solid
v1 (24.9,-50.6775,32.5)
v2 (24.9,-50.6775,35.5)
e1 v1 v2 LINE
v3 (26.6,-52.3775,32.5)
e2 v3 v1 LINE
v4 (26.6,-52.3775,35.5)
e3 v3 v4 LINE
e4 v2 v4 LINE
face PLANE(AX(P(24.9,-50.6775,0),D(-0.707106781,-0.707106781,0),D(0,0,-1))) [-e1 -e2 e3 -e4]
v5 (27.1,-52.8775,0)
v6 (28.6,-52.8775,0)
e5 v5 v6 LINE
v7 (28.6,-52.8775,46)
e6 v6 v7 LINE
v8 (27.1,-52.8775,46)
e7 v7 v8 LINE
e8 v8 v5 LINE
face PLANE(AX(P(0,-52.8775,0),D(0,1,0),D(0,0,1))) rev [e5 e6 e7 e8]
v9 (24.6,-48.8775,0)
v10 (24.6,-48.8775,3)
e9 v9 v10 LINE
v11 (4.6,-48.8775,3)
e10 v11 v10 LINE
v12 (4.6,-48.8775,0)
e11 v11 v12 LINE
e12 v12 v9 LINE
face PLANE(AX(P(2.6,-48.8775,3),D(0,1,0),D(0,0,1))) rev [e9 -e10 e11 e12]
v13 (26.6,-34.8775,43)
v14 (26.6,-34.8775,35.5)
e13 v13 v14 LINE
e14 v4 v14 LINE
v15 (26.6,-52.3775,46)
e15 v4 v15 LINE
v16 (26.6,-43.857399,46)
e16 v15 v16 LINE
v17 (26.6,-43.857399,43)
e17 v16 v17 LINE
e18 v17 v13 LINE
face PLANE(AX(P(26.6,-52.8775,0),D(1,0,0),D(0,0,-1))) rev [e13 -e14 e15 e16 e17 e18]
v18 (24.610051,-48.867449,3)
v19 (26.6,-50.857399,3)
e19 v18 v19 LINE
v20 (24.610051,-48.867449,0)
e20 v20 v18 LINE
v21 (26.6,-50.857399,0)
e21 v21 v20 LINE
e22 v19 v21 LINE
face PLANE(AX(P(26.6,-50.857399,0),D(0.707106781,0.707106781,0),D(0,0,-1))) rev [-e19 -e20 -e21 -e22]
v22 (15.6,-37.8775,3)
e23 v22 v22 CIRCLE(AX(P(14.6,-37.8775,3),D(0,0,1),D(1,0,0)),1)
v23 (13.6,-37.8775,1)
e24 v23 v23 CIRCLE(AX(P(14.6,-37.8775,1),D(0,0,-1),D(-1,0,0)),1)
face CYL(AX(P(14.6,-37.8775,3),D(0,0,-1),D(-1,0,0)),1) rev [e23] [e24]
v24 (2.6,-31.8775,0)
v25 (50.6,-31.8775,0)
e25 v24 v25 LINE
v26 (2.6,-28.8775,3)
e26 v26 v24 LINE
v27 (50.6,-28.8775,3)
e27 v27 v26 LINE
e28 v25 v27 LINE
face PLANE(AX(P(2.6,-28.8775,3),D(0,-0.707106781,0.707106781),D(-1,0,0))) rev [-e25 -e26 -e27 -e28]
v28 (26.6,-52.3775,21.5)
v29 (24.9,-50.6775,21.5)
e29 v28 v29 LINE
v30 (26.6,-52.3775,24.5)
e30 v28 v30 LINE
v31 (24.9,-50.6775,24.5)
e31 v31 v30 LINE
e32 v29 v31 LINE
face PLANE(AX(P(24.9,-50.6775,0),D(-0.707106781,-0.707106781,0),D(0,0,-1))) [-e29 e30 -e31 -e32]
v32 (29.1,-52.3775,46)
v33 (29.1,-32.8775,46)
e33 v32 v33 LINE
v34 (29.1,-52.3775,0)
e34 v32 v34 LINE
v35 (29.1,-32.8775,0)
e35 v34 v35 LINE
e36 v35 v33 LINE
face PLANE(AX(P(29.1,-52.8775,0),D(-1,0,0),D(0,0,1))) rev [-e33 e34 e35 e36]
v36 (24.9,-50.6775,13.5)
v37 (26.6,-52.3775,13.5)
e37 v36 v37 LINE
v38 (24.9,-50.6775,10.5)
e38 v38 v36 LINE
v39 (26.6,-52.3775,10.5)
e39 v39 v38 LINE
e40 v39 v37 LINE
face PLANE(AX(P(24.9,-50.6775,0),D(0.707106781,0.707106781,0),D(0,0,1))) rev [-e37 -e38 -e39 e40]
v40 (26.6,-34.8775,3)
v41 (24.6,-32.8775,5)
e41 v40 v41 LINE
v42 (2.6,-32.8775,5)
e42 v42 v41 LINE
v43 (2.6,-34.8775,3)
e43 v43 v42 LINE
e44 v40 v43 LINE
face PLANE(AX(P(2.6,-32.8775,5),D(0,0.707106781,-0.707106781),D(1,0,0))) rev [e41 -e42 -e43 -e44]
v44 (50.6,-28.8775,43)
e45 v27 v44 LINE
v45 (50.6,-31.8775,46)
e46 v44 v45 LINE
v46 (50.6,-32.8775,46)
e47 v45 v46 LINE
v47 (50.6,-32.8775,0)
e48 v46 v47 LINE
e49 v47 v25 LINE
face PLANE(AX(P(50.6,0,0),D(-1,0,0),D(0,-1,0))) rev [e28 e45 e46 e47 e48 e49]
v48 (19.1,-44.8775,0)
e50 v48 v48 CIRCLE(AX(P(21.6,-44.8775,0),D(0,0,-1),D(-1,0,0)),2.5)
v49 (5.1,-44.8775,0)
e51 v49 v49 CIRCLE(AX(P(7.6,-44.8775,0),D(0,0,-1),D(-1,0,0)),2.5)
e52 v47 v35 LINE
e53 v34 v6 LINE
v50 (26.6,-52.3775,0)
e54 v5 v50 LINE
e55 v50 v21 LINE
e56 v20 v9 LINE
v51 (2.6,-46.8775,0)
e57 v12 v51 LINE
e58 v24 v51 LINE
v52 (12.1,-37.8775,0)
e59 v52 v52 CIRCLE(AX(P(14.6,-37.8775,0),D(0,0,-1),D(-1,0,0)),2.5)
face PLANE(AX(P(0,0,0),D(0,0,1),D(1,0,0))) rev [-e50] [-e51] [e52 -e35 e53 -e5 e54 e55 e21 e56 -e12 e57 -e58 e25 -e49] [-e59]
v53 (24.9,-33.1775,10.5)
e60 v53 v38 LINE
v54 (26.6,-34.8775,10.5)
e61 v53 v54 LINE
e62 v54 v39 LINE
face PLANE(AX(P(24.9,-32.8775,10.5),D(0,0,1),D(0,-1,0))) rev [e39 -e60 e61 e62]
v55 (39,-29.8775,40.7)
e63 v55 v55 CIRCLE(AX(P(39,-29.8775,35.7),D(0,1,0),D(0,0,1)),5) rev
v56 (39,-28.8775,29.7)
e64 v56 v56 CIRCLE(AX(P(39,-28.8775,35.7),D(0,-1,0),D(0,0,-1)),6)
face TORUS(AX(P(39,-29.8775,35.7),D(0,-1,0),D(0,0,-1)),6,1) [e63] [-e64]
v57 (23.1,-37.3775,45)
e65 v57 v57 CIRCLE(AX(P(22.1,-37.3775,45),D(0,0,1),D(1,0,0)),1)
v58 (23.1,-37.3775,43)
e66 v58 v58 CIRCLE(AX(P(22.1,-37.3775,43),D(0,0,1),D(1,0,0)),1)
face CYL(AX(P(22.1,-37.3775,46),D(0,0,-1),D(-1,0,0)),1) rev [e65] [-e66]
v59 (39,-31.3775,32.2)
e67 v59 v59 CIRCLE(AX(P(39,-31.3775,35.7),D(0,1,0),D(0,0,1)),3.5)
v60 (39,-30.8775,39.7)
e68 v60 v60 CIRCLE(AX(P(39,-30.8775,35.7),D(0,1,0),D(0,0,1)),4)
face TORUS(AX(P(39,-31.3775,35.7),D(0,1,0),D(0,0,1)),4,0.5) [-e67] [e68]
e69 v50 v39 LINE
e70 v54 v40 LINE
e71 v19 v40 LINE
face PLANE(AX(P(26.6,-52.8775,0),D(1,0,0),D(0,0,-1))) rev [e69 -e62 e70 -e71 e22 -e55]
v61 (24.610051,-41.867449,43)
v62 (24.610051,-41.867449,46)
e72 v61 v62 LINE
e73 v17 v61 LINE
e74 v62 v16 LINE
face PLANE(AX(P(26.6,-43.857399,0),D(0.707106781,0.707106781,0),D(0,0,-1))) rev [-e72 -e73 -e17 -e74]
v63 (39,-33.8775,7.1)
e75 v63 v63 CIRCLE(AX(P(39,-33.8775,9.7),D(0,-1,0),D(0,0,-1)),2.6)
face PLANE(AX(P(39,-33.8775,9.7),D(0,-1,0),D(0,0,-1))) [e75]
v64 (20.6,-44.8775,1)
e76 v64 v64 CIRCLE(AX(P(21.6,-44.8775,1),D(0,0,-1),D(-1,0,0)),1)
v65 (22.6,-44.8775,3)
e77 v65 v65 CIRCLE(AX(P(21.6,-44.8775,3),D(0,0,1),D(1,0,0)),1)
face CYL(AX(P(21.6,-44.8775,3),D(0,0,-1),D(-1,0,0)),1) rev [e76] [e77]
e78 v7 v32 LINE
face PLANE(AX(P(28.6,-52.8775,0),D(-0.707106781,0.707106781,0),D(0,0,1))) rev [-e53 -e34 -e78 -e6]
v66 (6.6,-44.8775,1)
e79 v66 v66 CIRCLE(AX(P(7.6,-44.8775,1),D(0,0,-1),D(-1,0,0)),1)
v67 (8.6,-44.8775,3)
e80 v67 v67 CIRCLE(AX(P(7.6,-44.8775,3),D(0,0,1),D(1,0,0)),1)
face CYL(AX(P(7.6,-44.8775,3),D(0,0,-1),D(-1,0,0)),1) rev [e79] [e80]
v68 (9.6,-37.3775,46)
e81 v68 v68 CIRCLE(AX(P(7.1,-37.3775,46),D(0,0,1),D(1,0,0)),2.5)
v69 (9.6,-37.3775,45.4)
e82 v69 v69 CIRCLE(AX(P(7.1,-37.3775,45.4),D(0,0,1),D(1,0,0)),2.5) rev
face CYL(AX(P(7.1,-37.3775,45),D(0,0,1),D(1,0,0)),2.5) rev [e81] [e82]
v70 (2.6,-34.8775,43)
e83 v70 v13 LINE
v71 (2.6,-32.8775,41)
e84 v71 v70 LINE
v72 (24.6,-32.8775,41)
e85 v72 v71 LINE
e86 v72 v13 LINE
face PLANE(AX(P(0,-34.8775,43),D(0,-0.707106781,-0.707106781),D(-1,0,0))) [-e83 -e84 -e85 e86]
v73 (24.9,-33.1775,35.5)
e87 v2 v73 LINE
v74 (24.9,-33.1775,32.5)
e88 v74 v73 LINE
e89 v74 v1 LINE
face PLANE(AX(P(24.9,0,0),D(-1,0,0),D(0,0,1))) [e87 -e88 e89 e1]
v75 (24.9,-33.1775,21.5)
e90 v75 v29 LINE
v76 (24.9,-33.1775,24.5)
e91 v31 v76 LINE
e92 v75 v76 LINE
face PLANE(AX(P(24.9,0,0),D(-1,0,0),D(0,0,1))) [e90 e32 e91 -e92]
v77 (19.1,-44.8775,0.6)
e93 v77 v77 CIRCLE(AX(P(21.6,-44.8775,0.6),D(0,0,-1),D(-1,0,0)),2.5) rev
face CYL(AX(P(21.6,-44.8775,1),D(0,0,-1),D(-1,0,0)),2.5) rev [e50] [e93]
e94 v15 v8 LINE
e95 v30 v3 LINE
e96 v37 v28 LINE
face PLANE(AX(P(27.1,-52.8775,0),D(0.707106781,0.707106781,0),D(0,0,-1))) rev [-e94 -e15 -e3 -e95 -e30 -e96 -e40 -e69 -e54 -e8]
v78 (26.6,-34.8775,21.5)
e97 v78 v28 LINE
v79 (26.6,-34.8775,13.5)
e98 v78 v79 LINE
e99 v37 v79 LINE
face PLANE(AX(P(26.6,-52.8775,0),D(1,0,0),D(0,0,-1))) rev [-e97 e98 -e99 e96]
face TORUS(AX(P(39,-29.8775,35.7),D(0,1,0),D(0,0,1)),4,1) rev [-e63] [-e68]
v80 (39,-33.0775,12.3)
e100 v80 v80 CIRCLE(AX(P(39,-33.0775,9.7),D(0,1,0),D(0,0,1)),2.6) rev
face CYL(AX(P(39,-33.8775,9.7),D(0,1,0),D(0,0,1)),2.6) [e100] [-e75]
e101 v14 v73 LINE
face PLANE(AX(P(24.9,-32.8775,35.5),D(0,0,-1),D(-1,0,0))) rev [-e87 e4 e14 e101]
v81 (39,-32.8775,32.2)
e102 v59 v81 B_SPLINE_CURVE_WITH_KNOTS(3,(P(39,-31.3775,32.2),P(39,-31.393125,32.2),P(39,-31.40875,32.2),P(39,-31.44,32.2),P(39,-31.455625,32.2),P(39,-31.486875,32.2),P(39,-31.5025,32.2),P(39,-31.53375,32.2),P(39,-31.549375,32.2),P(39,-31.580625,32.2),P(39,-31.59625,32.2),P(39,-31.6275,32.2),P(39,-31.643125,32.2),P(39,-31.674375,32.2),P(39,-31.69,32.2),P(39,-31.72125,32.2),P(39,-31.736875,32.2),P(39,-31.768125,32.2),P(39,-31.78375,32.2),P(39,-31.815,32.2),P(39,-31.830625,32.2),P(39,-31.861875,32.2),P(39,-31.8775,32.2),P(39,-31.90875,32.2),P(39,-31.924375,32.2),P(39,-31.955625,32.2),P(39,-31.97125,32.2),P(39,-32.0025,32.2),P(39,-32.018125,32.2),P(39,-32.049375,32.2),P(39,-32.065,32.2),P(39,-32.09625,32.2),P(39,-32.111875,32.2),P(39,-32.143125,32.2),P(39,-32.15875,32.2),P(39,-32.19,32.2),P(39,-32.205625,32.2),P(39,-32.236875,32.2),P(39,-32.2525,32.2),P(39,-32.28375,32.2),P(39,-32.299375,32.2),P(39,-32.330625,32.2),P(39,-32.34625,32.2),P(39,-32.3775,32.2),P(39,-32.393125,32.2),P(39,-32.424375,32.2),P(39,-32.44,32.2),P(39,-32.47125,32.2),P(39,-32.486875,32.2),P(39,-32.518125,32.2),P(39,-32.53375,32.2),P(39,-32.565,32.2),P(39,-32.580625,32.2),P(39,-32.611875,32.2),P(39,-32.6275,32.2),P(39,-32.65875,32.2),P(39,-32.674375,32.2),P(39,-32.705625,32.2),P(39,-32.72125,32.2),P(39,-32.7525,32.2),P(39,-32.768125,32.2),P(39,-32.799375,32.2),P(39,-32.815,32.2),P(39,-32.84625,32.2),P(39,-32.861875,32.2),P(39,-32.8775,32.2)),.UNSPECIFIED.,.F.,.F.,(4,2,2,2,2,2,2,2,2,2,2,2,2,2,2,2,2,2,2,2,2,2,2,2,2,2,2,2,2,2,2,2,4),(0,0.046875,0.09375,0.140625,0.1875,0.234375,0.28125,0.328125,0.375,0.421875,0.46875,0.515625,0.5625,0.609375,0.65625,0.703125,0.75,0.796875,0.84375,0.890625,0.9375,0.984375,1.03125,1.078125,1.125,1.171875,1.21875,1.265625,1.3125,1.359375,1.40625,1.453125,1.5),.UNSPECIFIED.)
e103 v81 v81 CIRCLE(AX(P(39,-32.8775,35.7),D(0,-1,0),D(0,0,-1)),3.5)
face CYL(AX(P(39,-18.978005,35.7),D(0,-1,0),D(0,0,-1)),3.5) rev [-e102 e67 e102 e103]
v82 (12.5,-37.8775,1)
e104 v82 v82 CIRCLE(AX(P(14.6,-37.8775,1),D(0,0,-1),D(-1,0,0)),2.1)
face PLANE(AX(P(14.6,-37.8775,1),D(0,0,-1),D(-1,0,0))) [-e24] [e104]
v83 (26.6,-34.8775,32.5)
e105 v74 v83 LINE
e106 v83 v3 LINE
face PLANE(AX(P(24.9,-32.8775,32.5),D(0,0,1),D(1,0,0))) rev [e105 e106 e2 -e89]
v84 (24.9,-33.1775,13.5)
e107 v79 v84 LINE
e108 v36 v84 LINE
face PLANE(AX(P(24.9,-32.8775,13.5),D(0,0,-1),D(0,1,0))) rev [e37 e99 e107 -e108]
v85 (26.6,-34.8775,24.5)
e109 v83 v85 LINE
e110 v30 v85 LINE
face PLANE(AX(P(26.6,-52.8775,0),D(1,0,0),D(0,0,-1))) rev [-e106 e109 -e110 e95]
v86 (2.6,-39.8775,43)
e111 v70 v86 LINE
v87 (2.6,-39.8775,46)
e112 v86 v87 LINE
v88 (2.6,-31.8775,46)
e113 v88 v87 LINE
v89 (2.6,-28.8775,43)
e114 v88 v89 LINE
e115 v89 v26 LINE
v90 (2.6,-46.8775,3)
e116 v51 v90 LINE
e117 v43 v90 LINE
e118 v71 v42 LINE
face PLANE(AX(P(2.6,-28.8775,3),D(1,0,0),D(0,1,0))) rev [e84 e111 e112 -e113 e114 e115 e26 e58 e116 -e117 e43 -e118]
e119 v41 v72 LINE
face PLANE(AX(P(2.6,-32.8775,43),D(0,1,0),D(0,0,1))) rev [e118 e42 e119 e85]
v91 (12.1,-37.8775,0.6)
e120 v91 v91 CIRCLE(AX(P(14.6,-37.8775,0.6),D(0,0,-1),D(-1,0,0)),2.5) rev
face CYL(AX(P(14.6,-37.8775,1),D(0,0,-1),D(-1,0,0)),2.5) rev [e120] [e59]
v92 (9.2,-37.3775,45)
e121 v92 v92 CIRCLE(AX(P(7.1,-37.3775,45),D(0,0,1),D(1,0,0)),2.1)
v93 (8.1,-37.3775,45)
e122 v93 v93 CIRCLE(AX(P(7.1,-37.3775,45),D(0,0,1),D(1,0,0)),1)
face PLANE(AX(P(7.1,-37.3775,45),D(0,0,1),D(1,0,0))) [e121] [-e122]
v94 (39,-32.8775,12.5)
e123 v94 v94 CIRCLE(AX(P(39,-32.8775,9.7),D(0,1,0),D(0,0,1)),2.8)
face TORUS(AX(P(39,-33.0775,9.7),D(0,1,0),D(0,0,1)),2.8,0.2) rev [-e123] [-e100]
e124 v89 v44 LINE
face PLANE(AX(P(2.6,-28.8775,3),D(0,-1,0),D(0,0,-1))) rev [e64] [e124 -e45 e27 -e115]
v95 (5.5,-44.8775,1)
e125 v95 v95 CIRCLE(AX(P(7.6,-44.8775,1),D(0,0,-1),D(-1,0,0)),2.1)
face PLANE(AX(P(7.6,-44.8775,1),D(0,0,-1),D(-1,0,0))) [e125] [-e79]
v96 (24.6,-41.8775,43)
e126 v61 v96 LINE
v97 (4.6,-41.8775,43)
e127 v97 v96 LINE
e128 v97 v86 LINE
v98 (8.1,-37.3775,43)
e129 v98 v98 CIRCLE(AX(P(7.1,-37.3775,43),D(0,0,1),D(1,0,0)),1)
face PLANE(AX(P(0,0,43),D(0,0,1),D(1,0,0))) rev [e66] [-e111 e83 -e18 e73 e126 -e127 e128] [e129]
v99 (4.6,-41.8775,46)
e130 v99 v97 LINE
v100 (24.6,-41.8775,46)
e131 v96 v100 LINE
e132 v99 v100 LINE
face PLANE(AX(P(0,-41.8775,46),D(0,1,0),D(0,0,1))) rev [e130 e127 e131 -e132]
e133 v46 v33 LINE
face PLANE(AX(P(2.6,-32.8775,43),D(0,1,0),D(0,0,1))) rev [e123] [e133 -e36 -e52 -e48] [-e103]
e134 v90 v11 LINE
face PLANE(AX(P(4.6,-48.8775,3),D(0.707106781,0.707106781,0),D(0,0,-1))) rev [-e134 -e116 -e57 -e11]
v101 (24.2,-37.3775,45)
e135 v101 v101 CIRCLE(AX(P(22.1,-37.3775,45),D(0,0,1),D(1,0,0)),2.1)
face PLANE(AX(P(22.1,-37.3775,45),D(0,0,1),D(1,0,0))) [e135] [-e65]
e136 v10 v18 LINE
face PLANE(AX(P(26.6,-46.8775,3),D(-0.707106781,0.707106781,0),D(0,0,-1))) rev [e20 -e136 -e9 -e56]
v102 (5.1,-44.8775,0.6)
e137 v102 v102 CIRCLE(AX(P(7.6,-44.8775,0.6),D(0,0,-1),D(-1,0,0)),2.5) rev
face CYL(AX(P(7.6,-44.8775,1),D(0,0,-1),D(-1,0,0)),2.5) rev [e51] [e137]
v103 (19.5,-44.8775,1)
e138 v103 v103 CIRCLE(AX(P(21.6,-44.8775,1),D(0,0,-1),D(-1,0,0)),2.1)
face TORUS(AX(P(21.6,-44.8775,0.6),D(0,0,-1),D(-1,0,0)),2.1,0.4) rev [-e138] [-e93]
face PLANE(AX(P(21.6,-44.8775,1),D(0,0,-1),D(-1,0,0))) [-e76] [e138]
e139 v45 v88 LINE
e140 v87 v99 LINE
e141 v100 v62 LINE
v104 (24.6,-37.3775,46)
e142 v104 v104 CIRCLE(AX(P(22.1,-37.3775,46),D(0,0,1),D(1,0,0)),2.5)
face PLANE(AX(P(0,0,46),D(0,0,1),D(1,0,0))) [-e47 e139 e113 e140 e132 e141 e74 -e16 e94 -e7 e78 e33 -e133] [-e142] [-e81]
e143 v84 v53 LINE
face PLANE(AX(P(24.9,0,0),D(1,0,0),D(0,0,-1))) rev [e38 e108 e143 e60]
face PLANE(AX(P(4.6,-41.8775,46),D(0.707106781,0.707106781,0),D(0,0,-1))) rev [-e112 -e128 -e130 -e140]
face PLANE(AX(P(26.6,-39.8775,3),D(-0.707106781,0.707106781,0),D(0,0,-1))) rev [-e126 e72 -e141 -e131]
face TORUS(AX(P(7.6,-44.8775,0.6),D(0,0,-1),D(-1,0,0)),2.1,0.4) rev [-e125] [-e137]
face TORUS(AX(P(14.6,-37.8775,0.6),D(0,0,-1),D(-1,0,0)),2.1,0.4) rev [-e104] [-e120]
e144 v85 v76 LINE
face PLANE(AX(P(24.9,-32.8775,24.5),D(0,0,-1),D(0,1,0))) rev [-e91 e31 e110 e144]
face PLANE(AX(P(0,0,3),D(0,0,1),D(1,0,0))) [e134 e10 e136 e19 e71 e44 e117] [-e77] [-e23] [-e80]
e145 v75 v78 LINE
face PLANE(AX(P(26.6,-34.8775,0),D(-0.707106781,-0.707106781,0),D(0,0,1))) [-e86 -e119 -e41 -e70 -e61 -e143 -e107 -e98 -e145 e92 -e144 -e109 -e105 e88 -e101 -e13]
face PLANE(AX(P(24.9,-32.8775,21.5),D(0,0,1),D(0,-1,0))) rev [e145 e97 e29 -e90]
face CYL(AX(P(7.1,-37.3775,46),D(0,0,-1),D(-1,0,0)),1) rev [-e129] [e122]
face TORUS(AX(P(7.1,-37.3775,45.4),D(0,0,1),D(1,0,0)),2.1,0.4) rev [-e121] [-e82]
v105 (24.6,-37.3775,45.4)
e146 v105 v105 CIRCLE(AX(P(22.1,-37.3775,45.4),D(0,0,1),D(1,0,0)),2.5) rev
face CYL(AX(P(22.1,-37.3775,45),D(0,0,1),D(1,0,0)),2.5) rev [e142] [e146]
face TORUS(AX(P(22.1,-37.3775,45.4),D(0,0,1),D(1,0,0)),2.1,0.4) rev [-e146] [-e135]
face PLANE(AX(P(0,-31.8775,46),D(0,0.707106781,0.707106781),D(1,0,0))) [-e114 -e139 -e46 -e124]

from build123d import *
from OCP.BRepFilletAPI import BRepFilletAPI_MakeChamfer

# Parameters (mm, degrees)
SKETCH_1_W          = 24
SKETCH_1_H          = 20
SKETCH_1_R          = 1
EXTRUDE_1_DEPTH     = 3
SKETCH_2_W          = 24
SKETCH_2_H          = 4
EXTRUDE_2_DEPTH     = 40
SKETCH_3_W          = 24
SKETCH_3_H          = 4
SKETCH_3_H_2        = 9
SKETCH_3_R          = 1
EXTRUDE_3_DEPTH     = 3
EXTRUDE_START       = -3
SKETCH_4_R          = 1
EXTRUDE_4_DEPTH     = 3
CHAMFER_1_SIZE      = 2
SKETCH_5_R          = 2.5
CUT_EXTRUDE_1_DEPTH = 1
SKETCH_6_R          = 2.5
CUT_EXTRUDE_2_DEPTH = 1
FILLET_1_R          = 0.4
CHAMFER_3_SIZE      = 2
SKETCH_9_W          = 46
SKETCH_9_H          = 4
EXTRUDE_5_DEPTH     = 24
CHAMFER_2_SIZE      = 3
SKETCH_10_W         = 2.5
SKETCH_10_H         = 46
EXTRUDE_6_DEPTH     = 20
CHAMFER_4_SIZE      = 0.5
CHAMFER_5_SIZE      = 1.979898987
CHAMFER_5_SIZE_2    = 2.8
CHAMFER_6_SIZE      = 2
CHAMFER_6_SIZE_2    = 1.999970413
CHAMFER_7_SIZE      = 2
SKETCH_11_W         = 3
SKETCH_11_H         = 19.5
EXTRUDE_7_DEPTH     = 1.7
CHAMFER_8_SIZE      = 1.7
SKETCH_12_R         = 3.5
CUT_EXTRUDE_5_DEPTH = 4
SKETCH_13_R         = 5
CUT_EXTRUDE_6_DEPTH = 2
FILLET_3_R          = 1
SKETCH_14_R         = 2.6
EXTRUDE_8_DEPTH     = 1
FILLET_4_R          = 0.2
FILLET_5_R          = 0.5


# Some blends are built 0.0001 mm under size
with BuildPart() as part:
    # Эскиз1 → Бобышка-Вытянуть1 (new body)
    with BuildSketch(Plane.XY):
        with Locations((14.6, -38.877499952)):
            Rectangle(SKETCH_1_W, SKETCH_1_H)
        with Locations((7.1, -37.377499952)):
            Circle(SKETCH_1_R, mode=Mode.SUBTRACT)
        with Locations((22.1, -37.377499952)):
            Circle(SKETCH_1_R, mode=Mode.SUBTRACT)
        with Locations((14.6, -37.877499952)):
            Circle(SKETCH_1_R, mode=Mode.SUBTRACT)
        with Locations((21.6, -44.877499952)):
            Circle(SKETCH_1_R, mode=Mode.SUBTRACT)
        with Locations((7.6, -44.877499952)):
            Circle(SKETCH_1_R, mode=Mode.SUBTRACT)
    extrude(amount=EXTRUDE_1_DEPTH)

    # Эскиз2 → Бобышка-Вытянуть2 (add)
    with BuildSketch(Plane.XY.offset(3)):
        with Locations((14.6, -30.877499952)):
            Rectangle(SKETCH_2_W, SKETCH_2_H)
    extrude(amount=EXTRUDE_2_DEPTH)

    # Эскиз3 → Бобышка-Вытянуть3 (add)
    # profile 1 of 2: a face of its own
    with BuildSketch(Plane.XY.offset(43)):
        with Locations((14.6, -30.877499952)):
            Rectangle(SKETCH_3_W, SKETCH_3_H)
    # profile 2 of 2: a face of its own
    with BuildSketch(Plane.XY.offset(43)):
        with Locations((14.6, -37.377499952)):
            Rectangle(SKETCH_3_W, SKETCH_3_H_2)
        with Locations((7.1, -37.377499952)):
            Circle(SKETCH_3_R, mode=Mode.SUBTRACT)
        with Locations((22.1, -37.377499952)):
            Circle(SKETCH_3_R, mode=Mode.SUBTRACT)
    extrude(amount=EXTRUDE_3_DEPTH)

    # Эскиз4 → Бобышка-Вытянуть4 (add)
    with BuildSketch(Plane.XY.offset(3).offset(EXTRUDE_START)):
        with Locations((7.1, -37.377499952)):
            Circle(SKETCH_4_R)
        with Locations((22.1, -37.377499952)):
            Circle(SKETCH_4_R)
    extrude(amount=EXTRUDE_4_DEPTH)

    # Фаска1
    chamfer_1_edges = [part.edges().sort_by_distance(p)[0] for p in [
        (14.6, -32.877499952, 43),
        (14.6, -32.877499952, 3),
    ]]
    chamfer(chamfer_1_edges, length=CHAMFER_1_SIZE)

    # Эскиз5 → Вырез-Вытянуть1 (cut)
    with BuildSketch(Plane.XY.offset(46)):
        with Locations((7.1, -37.377499952)):
            Circle(SKETCH_5_R)
        with Locations((22.1, -37.377499952)):
            Circle(SKETCH_5_R)
    extrude(amount=-CUT_EXTRUDE_1_DEPTH, mode=Mode.SUBTRACT)

    # Эскиз6 → Вырез-Вытянуть2 (cut)
    with BuildSketch(Plane(origin=(0, 0, 0), x_dir=(-1, 0, 0), z_dir=(0, 0, -1))):
        with Locations((-14.6, -37.877499952)):
            Circle(SKETCH_6_R)
        with Locations((-7.6, -44.877499952)):
            Circle(SKETCH_6_R)
        with Locations((-21.6, -44.877499952)):
            Circle(SKETCH_6_R)
    extrude(amount=-CUT_EXTRUDE_2_DEPTH, mode=Mode.SUBTRACT)

    # Скругление1
    fillet_1_edges = [part.edges().sort_by_distance(p)[0] for p in [
        (19.6, -37.377499952, 45),
        (17.1, -37.877499952, 1),
        (10.1, -44.877499952, 1),
        (24.1, -44.877499952, 1),
        (4.6, -37.377499952, 45),
    ]]
    fillet(fillet_1_edges, radius=FILLET_1_R)

    # Фаска3
    chamfer_3_edges = [part.edges().sort_by_distance(p)[0] for p in [
        (2.6, -41.877499952, 44.5),
        (26.6, -41.877499952, 44.5),
        (26.6, -48.877499952, 1.5),
        (2.6, -48.877499952, 1.5),
    ]]
    chamfer(chamfer_3_edges, length=CHAMFER_3_SIZE)

    # Эскиз9 → Бобышка-Вытянуть5 (add)
    with BuildSketch(Plane(origin=(26.6, 0, 0), x_dir=(0, 0, -1), z_dir=(1, 0, 0))):
        with Locations((-23, -30.877499952)):
            Rectangle(SKETCH_9_W, SKETCH_9_H)
    extrude(amount=EXTRUDE_5_DEPTH)

    # Фаска2
    chamfer_2_edges = [part.edges().sort_by_distance(p)[0] for p in [
        (26.6, -28.877499952, 0),
        (26.6, -28.877499952, 46),
    ]]
    chamfer(chamfer_2_edges, length=CHAMFER_2_SIZE)

    # Эскиз10 → Бобышка-Вытянуть6 (add)
    with BuildSketch(Plane.XZ.offset(32.877499952)):
        with Locations((27.85, 23)):
            Rectangle(SKETCH_10_W, SKETCH_10_H)
    extrude(amount=EXTRUDE_6_DEPTH)

    # Фаска4
    chamfer_4_edges = [part.edges().sort_by_distance(p)[0] for p in [
        (26.6, -52.877499952, 23),
        (29.1, -52.877499952, 23),
    ]]
    chamfer(chamfer_4_edges, length=CHAMFER_4_SIZE)

    # Фаска5
    chamfer_5_edges_1 = [part.edges().sort_by_distance(p)[0] for p in [
        (26.6, -46.877499952, 1.5),
    ]]
    chamfer_5_side_1 = [part.faces().sort_by_distance(p)[0] for p in [
        (26.6, -46.917097932, 1.5),
    ]]
    chamfer_5_edges_2 = [part.edges().sort_by_distance(p)[0] for p in [
        (26.6, -39.877499952, 44.5),
    ]]
    chamfer_5_side_2 = [part.faces().sort_by_distance(p)[0] for p in [
        (26.6, -39.917097932, 44.5),
    ]]
    chamfer_5 = BRepFilletAPI_MakeChamfer(part.part.solid().wrapped)
    for e in chamfer_5_edges_1:
        chamfer_5.Add(CHAMFER_5_SIZE - 0.0001, CHAMFER_5_SIZE_2 - 0.0001, e.wrapped, chamfer_5_side_1[0].wrapped)
    for e in chamfer_5_edges_2:
        chamfer_5.Add(CHAMFER_5_SIZE - 0.0001, CHAMFER_5_SIZE_2 - 0.0001, e.wrapped, chamfer_5_side_2[0].wrapped)
    add(Compound.cast(chamfer_5.Shape()), mode=Mode.REPLACE)  # a hair under: the kernel refuses the full size

    # Фаска6
    # the kernel refuses this chamfer: 2, 1.999970413 mm, written as the material it adds along each edge
    with BuildSketch(Plane(origin=(26.6, -41.857298939, 43), x_dir=(-0.9996223235768031, 0.027481088168278975, 0), z_dir=(0, 0, 1)), Plane(origin=(26.6, -48.857298939, 0), x_dir=(-0.9996223235768031, 0.027481088168278975, 0), z_dir=(0, 0, 1))) as chamfer_6_piece_1:
        Polygon((CHAMFER_6_SIZE * 0.999621916911, CHAMFER_6_SIZE * 0.0274958766106), (-CHAMFER_6_SIZE_2 * 0.0274810881627, CHAMFER_6_SIZE_2 * 0.999622323373), (0, 0), align=None)
    extrude(amount=3)

    # Фаска7
    chamfer_7_edges = [part.edges().sort_by_distance(p)[0] for p in [
        (26.6, -32.877499952, 23),
    ]]
    chamfer(chamfer_7_edges, length=CHAMFER_7_SIZE)

    # Эскиз11 → Бобышка-Вытянуть7 (add)
    with BuildSketch(Plane.ZY.offset(-26.6)):
        with Locations((23, -42.627499952)):
            Rectangle(SKETCH_11_W, SKETCH_11_H)
        with Locations((34, -42.627499952)):
            Rectangle(SKETCH_11_W, SKETCH_11_H)
        with Locations((12, -42.627499952)):
            Rectangle(SKETCH_11_W, SKETCH_11_H)
    extrude(amount=EXTRUDE_7_DEPTH)

    # Фаска8
    chamfer_8_edges = [part.edges().sort_by_distance(p)[0] for p in [
        (24.9, -52.377499952, 12),
        (24.9, -52.377499952, 23),
        (24.9, -52.377499952, 34),
    ]]
    chamfer(chamfer_8_edges, length=CHAMFER_8_SIZE - 0.0001)  # a hair under: the kernel refuses the full size

    # Эскиз12 → Вырез-Вытянуть5 (cut)
    with BuildSketch(Plane.XZ.offset(32.877499952)):
        with Locations(Location((39, 35.7, 0), (0, 0, 270))):
            Circle(SKETCH_12_R)
    extrude(amount=-CUT_EXTRUDE_5_DEPTH, mode=Mode.SUBTRACT)

    # Эскиз13 → Вырез-Вытянуть6 (cut)
    with BuildSketch(Plane(origin=(0, -28.877499952, 0), x_dir=(1, 0, 0), z_dir=(0, 1, 0))):
        with Locations(Location((39, -35.7, 0), (0, 0, 270))):
            Circle(SKETCH_13_R)
    extrude(amount=-CUT_EXTRUDE_6_DEPTH, mode=Mode.SUBTRACT)

    # Скругление3
    fillet_3_edges = [part.edges().sort_by_distance(p)[0] for p in [
        (39, -28.877499952, 30.7),
        (39, -30.877499952, 30.7),
    ]]
    fillet(fillet_3_edges, radius=FILLET_3_R - 0.0001)  # a hair under: the kernel refuses the full size

    # Эскиз14 → Бобышка-Вытянуть8 (add)
    with BuildSketch(Plane.XZ.offset(32.877499952)):
        with Locations(Location((39, 9.7, 0), (0, 0, 90))):
            Circle(SKETCH_14_R)
    extrude(amount=EXTRUDE_8_DEPTH)

    # Скругление4
    fillet_4_edges = [part.edges().sort_by_distance(p)[0] for p in [
        (39, -32.877499952, 7.1),
    ]]
    fillet(fillet_4_edges, radius=FILLET_4_R)

    # Скругление5
    fillet_5_edges = [part.edges().sort_by_distance(p)[0] for p in [
        (39, -30.877499952, 39.2),
    ]]
    fillet(fillet_5_edges, radius=FILLET_5_R)


solid = part.part
